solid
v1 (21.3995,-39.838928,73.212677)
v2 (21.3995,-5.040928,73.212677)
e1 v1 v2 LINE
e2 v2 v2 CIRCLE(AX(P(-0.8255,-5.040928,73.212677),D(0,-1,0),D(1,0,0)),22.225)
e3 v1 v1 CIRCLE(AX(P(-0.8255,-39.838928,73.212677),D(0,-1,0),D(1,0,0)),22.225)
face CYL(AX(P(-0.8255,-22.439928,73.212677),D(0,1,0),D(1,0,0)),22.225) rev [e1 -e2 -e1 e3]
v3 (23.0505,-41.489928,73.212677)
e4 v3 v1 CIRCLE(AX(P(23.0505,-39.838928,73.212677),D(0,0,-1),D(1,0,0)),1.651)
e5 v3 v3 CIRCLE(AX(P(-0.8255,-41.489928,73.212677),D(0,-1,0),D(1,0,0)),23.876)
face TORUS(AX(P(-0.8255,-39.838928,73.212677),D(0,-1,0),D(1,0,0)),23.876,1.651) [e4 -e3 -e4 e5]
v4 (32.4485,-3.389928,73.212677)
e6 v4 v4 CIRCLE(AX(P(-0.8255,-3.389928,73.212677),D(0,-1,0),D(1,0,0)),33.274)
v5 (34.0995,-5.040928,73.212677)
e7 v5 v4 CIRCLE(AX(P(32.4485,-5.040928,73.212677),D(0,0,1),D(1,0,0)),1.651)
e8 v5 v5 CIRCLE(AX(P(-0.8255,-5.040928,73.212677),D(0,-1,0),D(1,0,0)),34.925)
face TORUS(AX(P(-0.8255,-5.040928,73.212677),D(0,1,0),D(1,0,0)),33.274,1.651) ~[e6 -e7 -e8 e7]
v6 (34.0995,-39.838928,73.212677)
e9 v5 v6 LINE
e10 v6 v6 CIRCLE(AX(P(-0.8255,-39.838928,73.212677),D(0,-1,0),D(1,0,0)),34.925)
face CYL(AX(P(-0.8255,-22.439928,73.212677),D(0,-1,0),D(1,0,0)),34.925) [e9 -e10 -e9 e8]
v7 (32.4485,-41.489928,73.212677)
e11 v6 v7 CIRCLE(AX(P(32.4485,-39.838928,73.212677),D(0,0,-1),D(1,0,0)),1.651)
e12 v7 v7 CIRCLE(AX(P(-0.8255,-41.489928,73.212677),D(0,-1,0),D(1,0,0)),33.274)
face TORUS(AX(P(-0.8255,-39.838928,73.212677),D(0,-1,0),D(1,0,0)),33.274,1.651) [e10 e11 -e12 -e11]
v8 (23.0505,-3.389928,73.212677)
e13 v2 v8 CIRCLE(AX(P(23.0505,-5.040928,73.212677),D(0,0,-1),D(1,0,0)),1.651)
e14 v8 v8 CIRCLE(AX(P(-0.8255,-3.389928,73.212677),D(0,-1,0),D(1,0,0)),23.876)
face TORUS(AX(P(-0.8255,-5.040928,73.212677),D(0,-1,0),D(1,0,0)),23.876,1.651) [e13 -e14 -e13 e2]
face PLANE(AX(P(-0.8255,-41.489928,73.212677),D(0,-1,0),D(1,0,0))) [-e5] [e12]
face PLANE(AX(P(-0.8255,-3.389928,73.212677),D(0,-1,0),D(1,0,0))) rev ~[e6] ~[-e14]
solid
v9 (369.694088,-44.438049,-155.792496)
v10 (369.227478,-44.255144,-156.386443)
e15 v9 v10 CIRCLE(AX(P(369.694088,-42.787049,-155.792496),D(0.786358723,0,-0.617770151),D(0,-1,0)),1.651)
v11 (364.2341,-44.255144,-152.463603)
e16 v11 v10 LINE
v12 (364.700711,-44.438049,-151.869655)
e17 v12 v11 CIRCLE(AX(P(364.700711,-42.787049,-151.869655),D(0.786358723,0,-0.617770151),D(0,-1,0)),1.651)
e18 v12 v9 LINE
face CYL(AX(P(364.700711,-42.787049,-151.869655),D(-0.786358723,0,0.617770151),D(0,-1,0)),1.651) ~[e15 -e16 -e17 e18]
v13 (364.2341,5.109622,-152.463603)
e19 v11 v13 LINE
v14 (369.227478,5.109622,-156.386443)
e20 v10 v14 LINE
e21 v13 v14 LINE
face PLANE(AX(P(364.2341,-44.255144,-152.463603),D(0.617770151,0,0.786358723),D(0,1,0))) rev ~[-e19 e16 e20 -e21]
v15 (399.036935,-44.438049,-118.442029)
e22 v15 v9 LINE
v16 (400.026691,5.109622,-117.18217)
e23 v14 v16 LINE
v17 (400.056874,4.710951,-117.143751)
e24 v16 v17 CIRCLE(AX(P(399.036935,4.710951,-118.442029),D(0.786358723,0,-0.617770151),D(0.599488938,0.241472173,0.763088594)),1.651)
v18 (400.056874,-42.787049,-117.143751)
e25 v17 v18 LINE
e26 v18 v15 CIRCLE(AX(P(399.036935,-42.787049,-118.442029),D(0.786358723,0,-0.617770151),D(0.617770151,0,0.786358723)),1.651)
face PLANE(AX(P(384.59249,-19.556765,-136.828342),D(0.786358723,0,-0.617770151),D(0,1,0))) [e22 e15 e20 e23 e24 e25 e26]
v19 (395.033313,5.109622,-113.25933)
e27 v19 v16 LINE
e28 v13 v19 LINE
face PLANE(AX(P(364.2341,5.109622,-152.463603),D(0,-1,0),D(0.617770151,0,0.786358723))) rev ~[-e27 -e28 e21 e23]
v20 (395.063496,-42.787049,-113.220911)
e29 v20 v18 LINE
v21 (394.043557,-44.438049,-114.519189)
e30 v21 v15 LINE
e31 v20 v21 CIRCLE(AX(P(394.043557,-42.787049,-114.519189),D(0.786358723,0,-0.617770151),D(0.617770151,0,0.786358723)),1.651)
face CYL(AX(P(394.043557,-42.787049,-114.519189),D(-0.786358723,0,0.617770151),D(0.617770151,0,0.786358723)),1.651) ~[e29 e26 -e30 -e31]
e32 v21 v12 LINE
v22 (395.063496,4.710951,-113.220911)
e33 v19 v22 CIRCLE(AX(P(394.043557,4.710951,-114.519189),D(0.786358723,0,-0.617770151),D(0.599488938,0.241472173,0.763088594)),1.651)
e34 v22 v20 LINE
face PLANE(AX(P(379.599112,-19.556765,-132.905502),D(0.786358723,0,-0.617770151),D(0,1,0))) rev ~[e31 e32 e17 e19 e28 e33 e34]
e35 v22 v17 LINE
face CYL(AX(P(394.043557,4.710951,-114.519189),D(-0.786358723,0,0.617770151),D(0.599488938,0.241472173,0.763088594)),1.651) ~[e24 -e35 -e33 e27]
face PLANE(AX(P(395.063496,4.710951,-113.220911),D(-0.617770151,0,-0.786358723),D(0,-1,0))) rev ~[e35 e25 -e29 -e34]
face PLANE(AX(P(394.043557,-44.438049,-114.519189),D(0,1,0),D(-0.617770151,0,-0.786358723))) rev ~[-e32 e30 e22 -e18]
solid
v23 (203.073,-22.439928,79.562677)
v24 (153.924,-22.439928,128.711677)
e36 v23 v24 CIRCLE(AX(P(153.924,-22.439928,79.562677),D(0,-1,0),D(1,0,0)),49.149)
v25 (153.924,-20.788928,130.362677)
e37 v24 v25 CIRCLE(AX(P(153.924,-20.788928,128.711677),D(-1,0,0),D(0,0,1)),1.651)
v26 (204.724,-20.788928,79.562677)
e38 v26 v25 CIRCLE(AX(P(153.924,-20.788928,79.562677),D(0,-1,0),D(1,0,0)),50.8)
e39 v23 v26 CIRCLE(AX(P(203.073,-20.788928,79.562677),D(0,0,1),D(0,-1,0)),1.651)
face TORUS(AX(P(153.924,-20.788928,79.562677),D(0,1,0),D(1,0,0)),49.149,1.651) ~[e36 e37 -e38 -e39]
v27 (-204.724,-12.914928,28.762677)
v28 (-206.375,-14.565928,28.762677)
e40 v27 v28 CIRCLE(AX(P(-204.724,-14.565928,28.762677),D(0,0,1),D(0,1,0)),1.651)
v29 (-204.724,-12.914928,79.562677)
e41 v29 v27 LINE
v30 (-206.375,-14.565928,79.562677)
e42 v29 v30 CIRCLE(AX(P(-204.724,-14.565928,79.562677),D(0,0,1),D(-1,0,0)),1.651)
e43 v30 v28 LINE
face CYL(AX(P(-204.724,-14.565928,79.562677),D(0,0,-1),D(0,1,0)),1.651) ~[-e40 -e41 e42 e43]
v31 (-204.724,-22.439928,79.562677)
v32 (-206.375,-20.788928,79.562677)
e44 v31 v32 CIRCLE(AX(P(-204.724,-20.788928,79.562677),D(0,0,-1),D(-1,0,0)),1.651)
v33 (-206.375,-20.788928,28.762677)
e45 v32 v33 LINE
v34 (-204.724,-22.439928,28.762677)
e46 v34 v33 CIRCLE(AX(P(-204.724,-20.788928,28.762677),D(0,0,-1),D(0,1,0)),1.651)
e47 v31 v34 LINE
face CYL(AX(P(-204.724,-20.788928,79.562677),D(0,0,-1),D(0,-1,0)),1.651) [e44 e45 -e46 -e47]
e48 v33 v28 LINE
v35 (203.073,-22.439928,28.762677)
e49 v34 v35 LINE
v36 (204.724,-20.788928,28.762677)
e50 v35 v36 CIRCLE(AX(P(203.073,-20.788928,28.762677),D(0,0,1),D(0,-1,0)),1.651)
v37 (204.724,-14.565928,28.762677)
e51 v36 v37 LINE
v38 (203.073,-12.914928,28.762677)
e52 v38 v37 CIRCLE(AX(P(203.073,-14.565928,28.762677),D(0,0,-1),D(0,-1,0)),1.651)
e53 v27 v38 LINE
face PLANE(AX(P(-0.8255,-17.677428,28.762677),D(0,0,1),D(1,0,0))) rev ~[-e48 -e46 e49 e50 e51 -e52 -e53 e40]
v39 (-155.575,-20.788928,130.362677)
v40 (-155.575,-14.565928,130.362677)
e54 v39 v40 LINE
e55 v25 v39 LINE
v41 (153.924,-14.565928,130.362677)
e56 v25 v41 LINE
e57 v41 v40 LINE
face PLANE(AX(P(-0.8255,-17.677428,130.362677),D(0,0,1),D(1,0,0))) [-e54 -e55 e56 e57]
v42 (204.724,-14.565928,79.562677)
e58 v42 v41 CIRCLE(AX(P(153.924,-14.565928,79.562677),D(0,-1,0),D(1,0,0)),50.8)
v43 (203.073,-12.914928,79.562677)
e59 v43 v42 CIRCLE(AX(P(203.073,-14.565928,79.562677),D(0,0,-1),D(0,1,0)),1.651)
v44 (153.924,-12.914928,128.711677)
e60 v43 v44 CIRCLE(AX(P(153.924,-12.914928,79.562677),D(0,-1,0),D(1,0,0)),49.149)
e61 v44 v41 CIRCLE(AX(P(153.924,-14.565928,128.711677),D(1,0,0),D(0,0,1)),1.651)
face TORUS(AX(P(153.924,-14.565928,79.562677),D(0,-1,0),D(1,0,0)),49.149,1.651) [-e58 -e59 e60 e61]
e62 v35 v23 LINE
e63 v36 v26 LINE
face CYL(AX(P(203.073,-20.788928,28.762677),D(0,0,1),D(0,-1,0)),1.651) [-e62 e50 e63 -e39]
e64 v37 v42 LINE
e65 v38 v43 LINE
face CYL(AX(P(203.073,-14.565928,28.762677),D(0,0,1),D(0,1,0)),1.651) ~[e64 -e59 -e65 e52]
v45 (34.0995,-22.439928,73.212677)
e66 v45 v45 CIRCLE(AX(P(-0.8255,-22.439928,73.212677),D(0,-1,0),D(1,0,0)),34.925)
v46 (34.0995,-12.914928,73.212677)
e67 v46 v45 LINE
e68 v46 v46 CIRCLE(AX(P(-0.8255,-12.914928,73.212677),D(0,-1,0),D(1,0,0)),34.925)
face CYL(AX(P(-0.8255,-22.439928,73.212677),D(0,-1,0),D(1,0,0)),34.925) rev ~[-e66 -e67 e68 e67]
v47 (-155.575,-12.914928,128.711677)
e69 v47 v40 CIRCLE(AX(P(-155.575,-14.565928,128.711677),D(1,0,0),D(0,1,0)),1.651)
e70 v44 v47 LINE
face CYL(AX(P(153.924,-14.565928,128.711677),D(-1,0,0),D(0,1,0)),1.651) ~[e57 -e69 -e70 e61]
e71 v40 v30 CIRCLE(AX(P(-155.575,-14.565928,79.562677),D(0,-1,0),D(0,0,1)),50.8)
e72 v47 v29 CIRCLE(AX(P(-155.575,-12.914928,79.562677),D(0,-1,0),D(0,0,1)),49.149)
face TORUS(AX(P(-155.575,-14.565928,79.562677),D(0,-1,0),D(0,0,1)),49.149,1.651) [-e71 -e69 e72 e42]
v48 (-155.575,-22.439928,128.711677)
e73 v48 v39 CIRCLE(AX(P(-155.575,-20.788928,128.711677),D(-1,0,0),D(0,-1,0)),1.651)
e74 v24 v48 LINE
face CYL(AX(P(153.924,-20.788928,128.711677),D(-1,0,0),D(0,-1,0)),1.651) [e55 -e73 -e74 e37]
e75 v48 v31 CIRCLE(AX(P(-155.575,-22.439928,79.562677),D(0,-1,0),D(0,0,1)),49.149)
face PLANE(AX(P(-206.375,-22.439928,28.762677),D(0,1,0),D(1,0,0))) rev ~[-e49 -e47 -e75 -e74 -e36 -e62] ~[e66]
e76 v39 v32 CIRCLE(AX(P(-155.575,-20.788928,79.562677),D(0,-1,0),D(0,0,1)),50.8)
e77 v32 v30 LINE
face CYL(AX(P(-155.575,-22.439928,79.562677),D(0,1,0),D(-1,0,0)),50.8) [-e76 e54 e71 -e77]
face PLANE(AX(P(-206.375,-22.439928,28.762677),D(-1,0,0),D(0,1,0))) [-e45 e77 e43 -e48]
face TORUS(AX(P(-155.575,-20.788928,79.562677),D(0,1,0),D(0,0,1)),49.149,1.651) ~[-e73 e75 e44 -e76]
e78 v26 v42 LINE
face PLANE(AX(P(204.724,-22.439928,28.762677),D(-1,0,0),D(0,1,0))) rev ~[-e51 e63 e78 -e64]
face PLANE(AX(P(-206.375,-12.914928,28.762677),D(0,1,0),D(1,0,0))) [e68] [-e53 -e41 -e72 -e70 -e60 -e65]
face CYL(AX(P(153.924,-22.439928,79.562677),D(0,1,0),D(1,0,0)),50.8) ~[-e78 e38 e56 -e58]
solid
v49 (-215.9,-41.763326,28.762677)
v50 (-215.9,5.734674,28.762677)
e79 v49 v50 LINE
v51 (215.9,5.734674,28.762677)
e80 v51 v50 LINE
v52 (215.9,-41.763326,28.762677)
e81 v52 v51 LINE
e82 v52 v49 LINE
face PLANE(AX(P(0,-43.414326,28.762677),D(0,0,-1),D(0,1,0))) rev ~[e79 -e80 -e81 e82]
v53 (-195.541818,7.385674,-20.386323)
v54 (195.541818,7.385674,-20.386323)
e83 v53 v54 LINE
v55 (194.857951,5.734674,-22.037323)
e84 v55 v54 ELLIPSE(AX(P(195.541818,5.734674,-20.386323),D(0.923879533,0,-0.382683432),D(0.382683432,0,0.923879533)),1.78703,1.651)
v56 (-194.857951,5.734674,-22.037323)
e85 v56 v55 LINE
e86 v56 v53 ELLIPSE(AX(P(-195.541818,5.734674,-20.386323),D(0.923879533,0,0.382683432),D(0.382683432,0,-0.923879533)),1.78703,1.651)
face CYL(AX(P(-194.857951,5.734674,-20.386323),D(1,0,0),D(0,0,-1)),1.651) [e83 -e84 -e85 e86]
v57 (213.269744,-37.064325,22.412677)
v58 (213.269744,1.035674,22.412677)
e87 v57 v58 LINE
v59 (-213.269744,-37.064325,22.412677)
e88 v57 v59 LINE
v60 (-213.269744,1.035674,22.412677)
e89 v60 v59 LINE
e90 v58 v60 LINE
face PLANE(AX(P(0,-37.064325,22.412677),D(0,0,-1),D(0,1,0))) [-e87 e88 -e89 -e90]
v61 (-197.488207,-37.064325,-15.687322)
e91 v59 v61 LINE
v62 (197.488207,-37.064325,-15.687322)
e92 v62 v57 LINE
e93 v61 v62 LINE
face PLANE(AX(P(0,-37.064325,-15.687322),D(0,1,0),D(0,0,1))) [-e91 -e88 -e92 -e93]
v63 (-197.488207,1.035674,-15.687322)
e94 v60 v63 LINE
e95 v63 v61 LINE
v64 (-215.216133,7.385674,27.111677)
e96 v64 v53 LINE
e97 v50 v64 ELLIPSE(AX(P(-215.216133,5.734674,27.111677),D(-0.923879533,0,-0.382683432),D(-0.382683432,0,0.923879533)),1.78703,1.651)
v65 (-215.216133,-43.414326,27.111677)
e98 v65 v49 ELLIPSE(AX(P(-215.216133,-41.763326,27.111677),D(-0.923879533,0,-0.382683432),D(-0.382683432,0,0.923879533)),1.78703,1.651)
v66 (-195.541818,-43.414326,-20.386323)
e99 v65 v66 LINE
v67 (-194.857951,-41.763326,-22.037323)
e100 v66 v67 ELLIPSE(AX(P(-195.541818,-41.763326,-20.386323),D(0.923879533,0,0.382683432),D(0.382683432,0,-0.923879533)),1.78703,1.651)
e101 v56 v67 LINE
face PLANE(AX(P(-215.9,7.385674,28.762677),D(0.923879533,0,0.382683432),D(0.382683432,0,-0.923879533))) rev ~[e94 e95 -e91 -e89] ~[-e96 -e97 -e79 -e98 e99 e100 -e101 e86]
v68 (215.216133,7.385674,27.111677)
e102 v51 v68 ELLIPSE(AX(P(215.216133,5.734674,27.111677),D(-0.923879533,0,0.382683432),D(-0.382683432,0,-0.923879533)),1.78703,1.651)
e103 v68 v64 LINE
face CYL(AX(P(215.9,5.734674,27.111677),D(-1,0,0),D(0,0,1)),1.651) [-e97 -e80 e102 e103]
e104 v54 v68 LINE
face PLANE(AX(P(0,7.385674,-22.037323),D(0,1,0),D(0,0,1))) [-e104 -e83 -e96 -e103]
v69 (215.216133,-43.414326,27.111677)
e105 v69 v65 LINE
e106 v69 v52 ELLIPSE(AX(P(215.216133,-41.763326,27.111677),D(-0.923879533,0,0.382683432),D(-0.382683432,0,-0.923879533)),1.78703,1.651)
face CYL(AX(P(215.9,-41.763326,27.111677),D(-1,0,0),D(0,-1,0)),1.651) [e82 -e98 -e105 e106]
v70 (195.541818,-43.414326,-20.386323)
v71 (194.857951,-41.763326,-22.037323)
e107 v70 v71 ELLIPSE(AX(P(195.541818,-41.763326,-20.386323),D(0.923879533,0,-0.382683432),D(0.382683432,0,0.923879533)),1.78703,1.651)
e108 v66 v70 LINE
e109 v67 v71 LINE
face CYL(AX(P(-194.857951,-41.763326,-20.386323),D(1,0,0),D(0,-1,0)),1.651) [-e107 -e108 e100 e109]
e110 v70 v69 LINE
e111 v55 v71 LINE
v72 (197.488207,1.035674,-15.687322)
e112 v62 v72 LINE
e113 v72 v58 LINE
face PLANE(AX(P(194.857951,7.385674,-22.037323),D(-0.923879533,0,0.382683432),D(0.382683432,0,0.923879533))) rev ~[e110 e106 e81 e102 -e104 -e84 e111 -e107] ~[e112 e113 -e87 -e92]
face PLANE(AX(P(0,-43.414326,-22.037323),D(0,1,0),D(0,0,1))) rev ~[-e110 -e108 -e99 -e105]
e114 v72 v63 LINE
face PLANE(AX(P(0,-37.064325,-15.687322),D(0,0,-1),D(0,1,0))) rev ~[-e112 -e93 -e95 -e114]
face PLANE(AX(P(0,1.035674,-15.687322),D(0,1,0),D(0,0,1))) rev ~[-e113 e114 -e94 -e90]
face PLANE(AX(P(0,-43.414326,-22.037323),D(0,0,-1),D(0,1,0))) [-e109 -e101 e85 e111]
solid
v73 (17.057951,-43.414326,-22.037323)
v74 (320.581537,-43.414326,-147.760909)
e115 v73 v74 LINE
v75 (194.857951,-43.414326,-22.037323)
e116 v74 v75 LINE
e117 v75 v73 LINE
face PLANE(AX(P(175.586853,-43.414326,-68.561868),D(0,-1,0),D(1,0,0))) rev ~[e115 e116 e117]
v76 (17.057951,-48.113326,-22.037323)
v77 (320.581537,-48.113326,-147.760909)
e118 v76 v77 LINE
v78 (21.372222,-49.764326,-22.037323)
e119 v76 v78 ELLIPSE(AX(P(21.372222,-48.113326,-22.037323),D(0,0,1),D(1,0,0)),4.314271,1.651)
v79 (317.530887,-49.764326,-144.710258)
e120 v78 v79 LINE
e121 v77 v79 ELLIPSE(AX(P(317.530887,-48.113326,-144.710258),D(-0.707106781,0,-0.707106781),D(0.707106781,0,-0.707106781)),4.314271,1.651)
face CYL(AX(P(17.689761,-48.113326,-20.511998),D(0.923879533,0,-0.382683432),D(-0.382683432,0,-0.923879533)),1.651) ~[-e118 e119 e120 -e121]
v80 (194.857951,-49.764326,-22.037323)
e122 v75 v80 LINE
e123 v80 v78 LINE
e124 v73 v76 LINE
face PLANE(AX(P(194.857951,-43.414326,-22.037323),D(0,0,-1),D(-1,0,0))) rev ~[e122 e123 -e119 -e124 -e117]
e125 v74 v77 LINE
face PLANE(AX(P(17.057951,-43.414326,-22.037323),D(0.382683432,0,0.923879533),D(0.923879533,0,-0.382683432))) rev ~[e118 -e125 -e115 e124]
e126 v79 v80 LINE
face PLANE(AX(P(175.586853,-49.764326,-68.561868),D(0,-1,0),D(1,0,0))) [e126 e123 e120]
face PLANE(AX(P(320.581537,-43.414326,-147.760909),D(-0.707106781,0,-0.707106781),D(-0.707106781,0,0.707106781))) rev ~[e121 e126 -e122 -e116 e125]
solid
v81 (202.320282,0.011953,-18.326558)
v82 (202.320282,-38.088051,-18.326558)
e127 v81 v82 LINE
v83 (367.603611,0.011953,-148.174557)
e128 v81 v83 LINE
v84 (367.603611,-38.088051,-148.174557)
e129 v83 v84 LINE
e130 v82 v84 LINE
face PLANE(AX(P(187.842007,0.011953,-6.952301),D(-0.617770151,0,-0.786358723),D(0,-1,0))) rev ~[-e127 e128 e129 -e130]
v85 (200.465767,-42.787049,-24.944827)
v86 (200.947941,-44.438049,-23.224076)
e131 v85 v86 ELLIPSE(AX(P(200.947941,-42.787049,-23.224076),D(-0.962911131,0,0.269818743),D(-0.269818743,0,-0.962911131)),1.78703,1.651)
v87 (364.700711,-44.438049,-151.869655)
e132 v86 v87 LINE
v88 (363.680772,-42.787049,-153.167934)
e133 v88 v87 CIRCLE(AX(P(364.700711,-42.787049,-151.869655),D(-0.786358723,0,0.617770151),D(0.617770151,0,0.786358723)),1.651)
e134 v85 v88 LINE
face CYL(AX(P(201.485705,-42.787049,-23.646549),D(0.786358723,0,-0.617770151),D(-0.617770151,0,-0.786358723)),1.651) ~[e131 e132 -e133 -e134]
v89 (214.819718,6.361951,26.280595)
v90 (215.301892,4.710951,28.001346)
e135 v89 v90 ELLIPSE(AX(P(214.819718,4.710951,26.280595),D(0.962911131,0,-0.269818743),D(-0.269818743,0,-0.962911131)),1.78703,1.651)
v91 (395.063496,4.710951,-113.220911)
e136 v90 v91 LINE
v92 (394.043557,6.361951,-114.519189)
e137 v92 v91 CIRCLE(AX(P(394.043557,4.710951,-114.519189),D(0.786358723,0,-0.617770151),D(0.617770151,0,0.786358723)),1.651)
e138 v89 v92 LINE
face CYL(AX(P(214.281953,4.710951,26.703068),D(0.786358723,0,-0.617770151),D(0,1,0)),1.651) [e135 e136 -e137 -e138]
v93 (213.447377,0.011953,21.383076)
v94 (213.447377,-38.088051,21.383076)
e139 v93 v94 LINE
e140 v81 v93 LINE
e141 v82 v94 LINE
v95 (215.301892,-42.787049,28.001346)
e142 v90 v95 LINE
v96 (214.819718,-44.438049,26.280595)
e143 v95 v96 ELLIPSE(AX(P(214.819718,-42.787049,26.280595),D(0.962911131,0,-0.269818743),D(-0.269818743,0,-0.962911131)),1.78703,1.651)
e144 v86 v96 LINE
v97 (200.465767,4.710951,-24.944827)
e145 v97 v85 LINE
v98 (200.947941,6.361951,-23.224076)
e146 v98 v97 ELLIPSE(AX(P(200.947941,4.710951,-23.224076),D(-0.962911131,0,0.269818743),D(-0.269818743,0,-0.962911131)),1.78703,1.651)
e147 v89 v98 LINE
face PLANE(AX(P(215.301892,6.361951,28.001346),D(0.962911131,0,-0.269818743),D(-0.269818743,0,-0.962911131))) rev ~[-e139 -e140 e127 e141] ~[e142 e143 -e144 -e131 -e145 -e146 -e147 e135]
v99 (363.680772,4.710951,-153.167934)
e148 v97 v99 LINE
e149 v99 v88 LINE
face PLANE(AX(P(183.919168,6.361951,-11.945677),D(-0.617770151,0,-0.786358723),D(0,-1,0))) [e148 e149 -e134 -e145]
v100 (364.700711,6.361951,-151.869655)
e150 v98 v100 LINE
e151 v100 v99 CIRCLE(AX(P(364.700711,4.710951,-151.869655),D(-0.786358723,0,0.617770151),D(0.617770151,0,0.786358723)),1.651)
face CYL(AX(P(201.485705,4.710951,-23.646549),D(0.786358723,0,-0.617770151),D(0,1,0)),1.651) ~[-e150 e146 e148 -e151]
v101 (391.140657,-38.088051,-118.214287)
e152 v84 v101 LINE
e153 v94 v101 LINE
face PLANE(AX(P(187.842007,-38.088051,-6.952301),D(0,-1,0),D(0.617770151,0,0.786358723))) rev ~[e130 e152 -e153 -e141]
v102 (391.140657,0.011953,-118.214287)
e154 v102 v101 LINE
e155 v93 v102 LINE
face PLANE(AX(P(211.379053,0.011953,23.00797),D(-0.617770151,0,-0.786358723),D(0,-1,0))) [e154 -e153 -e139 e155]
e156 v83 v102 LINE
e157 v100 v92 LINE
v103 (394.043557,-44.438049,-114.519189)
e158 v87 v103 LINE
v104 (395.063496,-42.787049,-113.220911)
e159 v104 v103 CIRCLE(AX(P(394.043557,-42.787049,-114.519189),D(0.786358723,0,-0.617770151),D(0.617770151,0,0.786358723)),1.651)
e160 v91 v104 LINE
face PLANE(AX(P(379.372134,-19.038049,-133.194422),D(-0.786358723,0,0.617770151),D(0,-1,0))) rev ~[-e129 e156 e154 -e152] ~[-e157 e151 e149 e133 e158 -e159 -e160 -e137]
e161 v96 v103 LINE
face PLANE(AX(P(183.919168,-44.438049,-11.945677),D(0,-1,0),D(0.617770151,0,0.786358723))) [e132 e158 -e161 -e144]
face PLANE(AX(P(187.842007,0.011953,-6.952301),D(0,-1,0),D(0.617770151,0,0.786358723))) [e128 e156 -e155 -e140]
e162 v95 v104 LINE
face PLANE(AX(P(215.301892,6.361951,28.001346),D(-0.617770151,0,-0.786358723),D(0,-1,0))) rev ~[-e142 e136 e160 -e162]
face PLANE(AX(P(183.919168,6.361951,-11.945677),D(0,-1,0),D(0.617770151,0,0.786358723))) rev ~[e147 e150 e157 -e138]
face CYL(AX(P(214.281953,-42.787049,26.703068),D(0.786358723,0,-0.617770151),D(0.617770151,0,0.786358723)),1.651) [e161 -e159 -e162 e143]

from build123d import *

# Parameters (mm, degrees)
F0_W      = 50.8
F0_H      = 50.8
F0_W_2    = 38.0999986082
F0_H_2    = 38.0999993041
F1_DEPTH  = 215.9
F3_DEPTH  = 50.801
F6_W      = 50.8
F6_H      = 50.8
F6_W_2    = 38.1000041962
F6_H_2    = 38.1000041962
F7_DEPTH  = 228.6
F9_DEPTH  = 50.801
F11_DEPTH = 6.35
F12_W     = 411.099
F12_H     = 9.525
F13_DEPTH = 101.6
F14_R     = 50.8
F15_R     = 22.225
F16_DEPTH = 25.4
F17_R     = 34.925
F17_R_2   = 22.225
F18_DEPTH = 19.05
F20_R     = 1.651
F20_2_R   = 1.651
F20_3_R   = 1.651
F20_4_R   = 1.651
F21_R     = 1.651
F22_W     = 38.1000041962
F22_H     = 38.1000041962
F23_DEPTH = 6.35


with BuildPart() as f1:
    # F0 (on Right) → F1 (new body, symmetric)
    with BuildSketch(Plane.YZ):
        with Locations((-18.0143257603, 3.3626770601)):
            Rectangle(F0_W, F0_H)
        with Locations((-18.0143257603, 3.362677408)):
            Rectangle(F0_W_2, F0_H_2, mode=Mode.SUBTRACT)
    extrude(amount=F1_DEPTH, both=True)

    # F2 (on face) → F3 (cut, through all)
    with BuildSketch(Plane(origin=(0, 7.3856742397, 0), x_dir=(-1, 0, 0), z_dir=(0, 1, 0))):
        Polygon((-194.8579510314, -22.0373229399), (-215.9, 28.7626770601), (-215.9, -22.0373229399), align=None)
        Polygon((215.9, -22.0373229399), (215.9, 28.7626770601), (194.8579510314, -22.0373229399), align=None)
    extrude(amount=-F3_DEPTH, mode=Mode.SUBTRACT)

    # F20
    f20_edges = [f1.edges().sort_by_distance(p)[0] for p in [
        (0, -43.414326, -22.037323),
        (0, -43.414326, 28.762677),
        (0, 7.385674, -22.037323),
        (0, 7.385674, 28.762677),
    ]]
    fillet(f20_edges, radius=F20_R)


with BuildPart() as f7:
    # F6 (on face) → F7 (new body)
    with BuildSketch(Plane(origin=(119.5313421825, 0, -93.9048466977), x_dir=(0, -1, 0), z_dir=(-0.7863587226, 0, 0.6177701509))):
        with Locations((19.0380490385, 129.6261847019)):
            Rectangle(F6_W, F6_H)
        with Locations((19.0380490385, 129.6261847019)):
            Rectangle(F6_W_2, F6_H_2, mode=Mode.SUBTRACT)
    extrude(amount=-F7_DEPTH)

    # F8 (on face) → F9 (cut, through all)
    with BuildSketch(Plane(origin=(0, 6.3619509615, 0), x_dir=(-1, 0, 0), z_dir=(0, 1, 0))):
        Polygon((-183.9191680339, -11.9456772311), (-215.3018916998, 28.0013458784), (-200.4657667823, -24.9448269977), align=None)
    extrude(amount=-F9_DEPTH, mode=Mode.SUBTRACT)

    # F20#2
    f20_2_edges = [f7.edges().sort_by_distance(p)[0] for p in [
        (282.073269, -44.438049, -89.05638),
        (305.182694, -44.438049, -42.609782),
        (305.182694, 6.361951, -42.609782),
        (282.073269, 6.361951, -89.05638),
    ]]
    fillet(f20_2_edges, radius=F20_2_R)


with BuildPart() as f11:
    # F10 (on face) → F11 (new body)
    with BuildSketch(Plane.XZ.offset(43.4143257603)):
        Polygon((320.5815367264, -147.7609086349), (194.8579510314, -22.0373229399), (17.0579510314, -22.0373229399), align=None)
    extrude(amount=F11_DEPTH)

    # F20#3
    f20_3_edges = [f11.edges().sort_by_distance(p)[0] for p in [
        (168.819744, -49.764326, -84.899116),
    ]]
    fillet(f20_3_edges, radius=F20_3_R)


with BuildPart() as f13:
    # F12 (on face) → F13 (new body)
    with BuildSketch(Plane.XY.offset(28.7626770601)):
        with Locations((-0.8255, -17.6774282008)):
            Rectangle(F12_W, F12_H)
    extrude(amount=F13_DEPTH)

    # F14
    f14_edges = [f13.edges().sort_by_distance(p)[0] for p in [
        (-206.375, -17.677428, 130.362677),
        (204.724, -17.677428, 130.362677),
    ]]
    fillet(f14_edges, radius=F14_R)

    # F15 (on face) → F16 (cut)
    with BuildSketch(Plane.XZ.offset(22.4399282008)):
        with Locations((-0.8255, 73.2126770601)):
            Circle(F15_R)
    extrude(amount=-F16_DEPTH, mode=Mode.SUBTRACT)


with BuildPart() as f18:
    # F17 (on face) → F18 (new body, symmetric)
    with BuildSketch(Plane.XZ.offset(22.4399282008)):
        with Locations((-0.8255, 73.2126770601)):
            Circle(F17_R)
        with Locations((-0.8255, 73.2126770601)):
            Circle(F17_R_2, mode=Mode.SUBTRACT)
    extrude(amount=F18_DEPTH, both=True)


with BuildPart() as f13_1:
    add(f13.part)

    # F19: cut F18
    add(f18.part, mode=Mode.SUBTRACT)

    # F20#4
    f20_4_edges = [f13_1.edges().sort_by_distance(p)[0] for p in [
        (204.724, -12.914928, 54.162677),
        (189.845024, -12.914928, 115.483702),
        (204.724, -22.439928, 54.162677),
    ]]
    fillet(f20_4_edges, radius=F20_4_R)


with BuildPart() as f18_1:
    add(f18.part)

    # F21
    f21_edges = [f18_1.edges().sort_by_distance(p)[0] for p in [
        (-23.0505, -3.389928, 73.212677),
        (-35.7505, -3.389928, 73.212677),
        (-23.0505, -41.489928, 73.212677),
        (-35.7505, -41.489928, 73.212677),
    ]]
    fillet(f21_edges, radius=F21_R)


with BuildPart() as f23:
    # F22 (on face) → F23 (new body)
    with BuildSketch(Plane(origin=(299.2929461753, 0, -235.1271031941), x_dir=(0, 1, 0), z_dir=(0.7863587226, 0, -0.6177701509))):
        with BuildLine():
            Line((5.1096215189, 105.1218711495), (5.1096215189, 154.9773278874))
            ThreePointArc((5.1096215189, 154.9773278874), (4.9117775046, 155.0139249802), (4.7109509615, 155.0261847019))
            Line((4.7109509615, 155.0261847019), (-42.7870490385, 155.0261847019))
            ThreePointArc((-42.7870490385, 155.0261847019), (-43.9544823342, 154.5426179977), (-44.4380490385, 153.3751847019))
            Line((-44.4380490385, 153.3751847019), (-44.4380490385, 105.8771847019))
            ThreePointArc((-44.4380490385, 105.8771847019), (-44.3916713568, 105.4886126807), (-44.2551438711, 105.1218711495))
            Line((-44.2551438711, 105.1218711495), (5.1096215189, 105.1218711495))
        make_face()
        with Locations((-19.0380490385, 129.6261847019)):
            Rectangle(F22_W, F22_H, mode=Mode.SUBTRACT)
        with Locations((-19.0380490385, 129.6261847019)):
            Rectangle(F22_W, F22_H)
    extrude(amount=F23_DEPTH)


solid = Compound([f1.part, f7.part, f11.part, f13_1.part, f18_1.part, f23.part])
